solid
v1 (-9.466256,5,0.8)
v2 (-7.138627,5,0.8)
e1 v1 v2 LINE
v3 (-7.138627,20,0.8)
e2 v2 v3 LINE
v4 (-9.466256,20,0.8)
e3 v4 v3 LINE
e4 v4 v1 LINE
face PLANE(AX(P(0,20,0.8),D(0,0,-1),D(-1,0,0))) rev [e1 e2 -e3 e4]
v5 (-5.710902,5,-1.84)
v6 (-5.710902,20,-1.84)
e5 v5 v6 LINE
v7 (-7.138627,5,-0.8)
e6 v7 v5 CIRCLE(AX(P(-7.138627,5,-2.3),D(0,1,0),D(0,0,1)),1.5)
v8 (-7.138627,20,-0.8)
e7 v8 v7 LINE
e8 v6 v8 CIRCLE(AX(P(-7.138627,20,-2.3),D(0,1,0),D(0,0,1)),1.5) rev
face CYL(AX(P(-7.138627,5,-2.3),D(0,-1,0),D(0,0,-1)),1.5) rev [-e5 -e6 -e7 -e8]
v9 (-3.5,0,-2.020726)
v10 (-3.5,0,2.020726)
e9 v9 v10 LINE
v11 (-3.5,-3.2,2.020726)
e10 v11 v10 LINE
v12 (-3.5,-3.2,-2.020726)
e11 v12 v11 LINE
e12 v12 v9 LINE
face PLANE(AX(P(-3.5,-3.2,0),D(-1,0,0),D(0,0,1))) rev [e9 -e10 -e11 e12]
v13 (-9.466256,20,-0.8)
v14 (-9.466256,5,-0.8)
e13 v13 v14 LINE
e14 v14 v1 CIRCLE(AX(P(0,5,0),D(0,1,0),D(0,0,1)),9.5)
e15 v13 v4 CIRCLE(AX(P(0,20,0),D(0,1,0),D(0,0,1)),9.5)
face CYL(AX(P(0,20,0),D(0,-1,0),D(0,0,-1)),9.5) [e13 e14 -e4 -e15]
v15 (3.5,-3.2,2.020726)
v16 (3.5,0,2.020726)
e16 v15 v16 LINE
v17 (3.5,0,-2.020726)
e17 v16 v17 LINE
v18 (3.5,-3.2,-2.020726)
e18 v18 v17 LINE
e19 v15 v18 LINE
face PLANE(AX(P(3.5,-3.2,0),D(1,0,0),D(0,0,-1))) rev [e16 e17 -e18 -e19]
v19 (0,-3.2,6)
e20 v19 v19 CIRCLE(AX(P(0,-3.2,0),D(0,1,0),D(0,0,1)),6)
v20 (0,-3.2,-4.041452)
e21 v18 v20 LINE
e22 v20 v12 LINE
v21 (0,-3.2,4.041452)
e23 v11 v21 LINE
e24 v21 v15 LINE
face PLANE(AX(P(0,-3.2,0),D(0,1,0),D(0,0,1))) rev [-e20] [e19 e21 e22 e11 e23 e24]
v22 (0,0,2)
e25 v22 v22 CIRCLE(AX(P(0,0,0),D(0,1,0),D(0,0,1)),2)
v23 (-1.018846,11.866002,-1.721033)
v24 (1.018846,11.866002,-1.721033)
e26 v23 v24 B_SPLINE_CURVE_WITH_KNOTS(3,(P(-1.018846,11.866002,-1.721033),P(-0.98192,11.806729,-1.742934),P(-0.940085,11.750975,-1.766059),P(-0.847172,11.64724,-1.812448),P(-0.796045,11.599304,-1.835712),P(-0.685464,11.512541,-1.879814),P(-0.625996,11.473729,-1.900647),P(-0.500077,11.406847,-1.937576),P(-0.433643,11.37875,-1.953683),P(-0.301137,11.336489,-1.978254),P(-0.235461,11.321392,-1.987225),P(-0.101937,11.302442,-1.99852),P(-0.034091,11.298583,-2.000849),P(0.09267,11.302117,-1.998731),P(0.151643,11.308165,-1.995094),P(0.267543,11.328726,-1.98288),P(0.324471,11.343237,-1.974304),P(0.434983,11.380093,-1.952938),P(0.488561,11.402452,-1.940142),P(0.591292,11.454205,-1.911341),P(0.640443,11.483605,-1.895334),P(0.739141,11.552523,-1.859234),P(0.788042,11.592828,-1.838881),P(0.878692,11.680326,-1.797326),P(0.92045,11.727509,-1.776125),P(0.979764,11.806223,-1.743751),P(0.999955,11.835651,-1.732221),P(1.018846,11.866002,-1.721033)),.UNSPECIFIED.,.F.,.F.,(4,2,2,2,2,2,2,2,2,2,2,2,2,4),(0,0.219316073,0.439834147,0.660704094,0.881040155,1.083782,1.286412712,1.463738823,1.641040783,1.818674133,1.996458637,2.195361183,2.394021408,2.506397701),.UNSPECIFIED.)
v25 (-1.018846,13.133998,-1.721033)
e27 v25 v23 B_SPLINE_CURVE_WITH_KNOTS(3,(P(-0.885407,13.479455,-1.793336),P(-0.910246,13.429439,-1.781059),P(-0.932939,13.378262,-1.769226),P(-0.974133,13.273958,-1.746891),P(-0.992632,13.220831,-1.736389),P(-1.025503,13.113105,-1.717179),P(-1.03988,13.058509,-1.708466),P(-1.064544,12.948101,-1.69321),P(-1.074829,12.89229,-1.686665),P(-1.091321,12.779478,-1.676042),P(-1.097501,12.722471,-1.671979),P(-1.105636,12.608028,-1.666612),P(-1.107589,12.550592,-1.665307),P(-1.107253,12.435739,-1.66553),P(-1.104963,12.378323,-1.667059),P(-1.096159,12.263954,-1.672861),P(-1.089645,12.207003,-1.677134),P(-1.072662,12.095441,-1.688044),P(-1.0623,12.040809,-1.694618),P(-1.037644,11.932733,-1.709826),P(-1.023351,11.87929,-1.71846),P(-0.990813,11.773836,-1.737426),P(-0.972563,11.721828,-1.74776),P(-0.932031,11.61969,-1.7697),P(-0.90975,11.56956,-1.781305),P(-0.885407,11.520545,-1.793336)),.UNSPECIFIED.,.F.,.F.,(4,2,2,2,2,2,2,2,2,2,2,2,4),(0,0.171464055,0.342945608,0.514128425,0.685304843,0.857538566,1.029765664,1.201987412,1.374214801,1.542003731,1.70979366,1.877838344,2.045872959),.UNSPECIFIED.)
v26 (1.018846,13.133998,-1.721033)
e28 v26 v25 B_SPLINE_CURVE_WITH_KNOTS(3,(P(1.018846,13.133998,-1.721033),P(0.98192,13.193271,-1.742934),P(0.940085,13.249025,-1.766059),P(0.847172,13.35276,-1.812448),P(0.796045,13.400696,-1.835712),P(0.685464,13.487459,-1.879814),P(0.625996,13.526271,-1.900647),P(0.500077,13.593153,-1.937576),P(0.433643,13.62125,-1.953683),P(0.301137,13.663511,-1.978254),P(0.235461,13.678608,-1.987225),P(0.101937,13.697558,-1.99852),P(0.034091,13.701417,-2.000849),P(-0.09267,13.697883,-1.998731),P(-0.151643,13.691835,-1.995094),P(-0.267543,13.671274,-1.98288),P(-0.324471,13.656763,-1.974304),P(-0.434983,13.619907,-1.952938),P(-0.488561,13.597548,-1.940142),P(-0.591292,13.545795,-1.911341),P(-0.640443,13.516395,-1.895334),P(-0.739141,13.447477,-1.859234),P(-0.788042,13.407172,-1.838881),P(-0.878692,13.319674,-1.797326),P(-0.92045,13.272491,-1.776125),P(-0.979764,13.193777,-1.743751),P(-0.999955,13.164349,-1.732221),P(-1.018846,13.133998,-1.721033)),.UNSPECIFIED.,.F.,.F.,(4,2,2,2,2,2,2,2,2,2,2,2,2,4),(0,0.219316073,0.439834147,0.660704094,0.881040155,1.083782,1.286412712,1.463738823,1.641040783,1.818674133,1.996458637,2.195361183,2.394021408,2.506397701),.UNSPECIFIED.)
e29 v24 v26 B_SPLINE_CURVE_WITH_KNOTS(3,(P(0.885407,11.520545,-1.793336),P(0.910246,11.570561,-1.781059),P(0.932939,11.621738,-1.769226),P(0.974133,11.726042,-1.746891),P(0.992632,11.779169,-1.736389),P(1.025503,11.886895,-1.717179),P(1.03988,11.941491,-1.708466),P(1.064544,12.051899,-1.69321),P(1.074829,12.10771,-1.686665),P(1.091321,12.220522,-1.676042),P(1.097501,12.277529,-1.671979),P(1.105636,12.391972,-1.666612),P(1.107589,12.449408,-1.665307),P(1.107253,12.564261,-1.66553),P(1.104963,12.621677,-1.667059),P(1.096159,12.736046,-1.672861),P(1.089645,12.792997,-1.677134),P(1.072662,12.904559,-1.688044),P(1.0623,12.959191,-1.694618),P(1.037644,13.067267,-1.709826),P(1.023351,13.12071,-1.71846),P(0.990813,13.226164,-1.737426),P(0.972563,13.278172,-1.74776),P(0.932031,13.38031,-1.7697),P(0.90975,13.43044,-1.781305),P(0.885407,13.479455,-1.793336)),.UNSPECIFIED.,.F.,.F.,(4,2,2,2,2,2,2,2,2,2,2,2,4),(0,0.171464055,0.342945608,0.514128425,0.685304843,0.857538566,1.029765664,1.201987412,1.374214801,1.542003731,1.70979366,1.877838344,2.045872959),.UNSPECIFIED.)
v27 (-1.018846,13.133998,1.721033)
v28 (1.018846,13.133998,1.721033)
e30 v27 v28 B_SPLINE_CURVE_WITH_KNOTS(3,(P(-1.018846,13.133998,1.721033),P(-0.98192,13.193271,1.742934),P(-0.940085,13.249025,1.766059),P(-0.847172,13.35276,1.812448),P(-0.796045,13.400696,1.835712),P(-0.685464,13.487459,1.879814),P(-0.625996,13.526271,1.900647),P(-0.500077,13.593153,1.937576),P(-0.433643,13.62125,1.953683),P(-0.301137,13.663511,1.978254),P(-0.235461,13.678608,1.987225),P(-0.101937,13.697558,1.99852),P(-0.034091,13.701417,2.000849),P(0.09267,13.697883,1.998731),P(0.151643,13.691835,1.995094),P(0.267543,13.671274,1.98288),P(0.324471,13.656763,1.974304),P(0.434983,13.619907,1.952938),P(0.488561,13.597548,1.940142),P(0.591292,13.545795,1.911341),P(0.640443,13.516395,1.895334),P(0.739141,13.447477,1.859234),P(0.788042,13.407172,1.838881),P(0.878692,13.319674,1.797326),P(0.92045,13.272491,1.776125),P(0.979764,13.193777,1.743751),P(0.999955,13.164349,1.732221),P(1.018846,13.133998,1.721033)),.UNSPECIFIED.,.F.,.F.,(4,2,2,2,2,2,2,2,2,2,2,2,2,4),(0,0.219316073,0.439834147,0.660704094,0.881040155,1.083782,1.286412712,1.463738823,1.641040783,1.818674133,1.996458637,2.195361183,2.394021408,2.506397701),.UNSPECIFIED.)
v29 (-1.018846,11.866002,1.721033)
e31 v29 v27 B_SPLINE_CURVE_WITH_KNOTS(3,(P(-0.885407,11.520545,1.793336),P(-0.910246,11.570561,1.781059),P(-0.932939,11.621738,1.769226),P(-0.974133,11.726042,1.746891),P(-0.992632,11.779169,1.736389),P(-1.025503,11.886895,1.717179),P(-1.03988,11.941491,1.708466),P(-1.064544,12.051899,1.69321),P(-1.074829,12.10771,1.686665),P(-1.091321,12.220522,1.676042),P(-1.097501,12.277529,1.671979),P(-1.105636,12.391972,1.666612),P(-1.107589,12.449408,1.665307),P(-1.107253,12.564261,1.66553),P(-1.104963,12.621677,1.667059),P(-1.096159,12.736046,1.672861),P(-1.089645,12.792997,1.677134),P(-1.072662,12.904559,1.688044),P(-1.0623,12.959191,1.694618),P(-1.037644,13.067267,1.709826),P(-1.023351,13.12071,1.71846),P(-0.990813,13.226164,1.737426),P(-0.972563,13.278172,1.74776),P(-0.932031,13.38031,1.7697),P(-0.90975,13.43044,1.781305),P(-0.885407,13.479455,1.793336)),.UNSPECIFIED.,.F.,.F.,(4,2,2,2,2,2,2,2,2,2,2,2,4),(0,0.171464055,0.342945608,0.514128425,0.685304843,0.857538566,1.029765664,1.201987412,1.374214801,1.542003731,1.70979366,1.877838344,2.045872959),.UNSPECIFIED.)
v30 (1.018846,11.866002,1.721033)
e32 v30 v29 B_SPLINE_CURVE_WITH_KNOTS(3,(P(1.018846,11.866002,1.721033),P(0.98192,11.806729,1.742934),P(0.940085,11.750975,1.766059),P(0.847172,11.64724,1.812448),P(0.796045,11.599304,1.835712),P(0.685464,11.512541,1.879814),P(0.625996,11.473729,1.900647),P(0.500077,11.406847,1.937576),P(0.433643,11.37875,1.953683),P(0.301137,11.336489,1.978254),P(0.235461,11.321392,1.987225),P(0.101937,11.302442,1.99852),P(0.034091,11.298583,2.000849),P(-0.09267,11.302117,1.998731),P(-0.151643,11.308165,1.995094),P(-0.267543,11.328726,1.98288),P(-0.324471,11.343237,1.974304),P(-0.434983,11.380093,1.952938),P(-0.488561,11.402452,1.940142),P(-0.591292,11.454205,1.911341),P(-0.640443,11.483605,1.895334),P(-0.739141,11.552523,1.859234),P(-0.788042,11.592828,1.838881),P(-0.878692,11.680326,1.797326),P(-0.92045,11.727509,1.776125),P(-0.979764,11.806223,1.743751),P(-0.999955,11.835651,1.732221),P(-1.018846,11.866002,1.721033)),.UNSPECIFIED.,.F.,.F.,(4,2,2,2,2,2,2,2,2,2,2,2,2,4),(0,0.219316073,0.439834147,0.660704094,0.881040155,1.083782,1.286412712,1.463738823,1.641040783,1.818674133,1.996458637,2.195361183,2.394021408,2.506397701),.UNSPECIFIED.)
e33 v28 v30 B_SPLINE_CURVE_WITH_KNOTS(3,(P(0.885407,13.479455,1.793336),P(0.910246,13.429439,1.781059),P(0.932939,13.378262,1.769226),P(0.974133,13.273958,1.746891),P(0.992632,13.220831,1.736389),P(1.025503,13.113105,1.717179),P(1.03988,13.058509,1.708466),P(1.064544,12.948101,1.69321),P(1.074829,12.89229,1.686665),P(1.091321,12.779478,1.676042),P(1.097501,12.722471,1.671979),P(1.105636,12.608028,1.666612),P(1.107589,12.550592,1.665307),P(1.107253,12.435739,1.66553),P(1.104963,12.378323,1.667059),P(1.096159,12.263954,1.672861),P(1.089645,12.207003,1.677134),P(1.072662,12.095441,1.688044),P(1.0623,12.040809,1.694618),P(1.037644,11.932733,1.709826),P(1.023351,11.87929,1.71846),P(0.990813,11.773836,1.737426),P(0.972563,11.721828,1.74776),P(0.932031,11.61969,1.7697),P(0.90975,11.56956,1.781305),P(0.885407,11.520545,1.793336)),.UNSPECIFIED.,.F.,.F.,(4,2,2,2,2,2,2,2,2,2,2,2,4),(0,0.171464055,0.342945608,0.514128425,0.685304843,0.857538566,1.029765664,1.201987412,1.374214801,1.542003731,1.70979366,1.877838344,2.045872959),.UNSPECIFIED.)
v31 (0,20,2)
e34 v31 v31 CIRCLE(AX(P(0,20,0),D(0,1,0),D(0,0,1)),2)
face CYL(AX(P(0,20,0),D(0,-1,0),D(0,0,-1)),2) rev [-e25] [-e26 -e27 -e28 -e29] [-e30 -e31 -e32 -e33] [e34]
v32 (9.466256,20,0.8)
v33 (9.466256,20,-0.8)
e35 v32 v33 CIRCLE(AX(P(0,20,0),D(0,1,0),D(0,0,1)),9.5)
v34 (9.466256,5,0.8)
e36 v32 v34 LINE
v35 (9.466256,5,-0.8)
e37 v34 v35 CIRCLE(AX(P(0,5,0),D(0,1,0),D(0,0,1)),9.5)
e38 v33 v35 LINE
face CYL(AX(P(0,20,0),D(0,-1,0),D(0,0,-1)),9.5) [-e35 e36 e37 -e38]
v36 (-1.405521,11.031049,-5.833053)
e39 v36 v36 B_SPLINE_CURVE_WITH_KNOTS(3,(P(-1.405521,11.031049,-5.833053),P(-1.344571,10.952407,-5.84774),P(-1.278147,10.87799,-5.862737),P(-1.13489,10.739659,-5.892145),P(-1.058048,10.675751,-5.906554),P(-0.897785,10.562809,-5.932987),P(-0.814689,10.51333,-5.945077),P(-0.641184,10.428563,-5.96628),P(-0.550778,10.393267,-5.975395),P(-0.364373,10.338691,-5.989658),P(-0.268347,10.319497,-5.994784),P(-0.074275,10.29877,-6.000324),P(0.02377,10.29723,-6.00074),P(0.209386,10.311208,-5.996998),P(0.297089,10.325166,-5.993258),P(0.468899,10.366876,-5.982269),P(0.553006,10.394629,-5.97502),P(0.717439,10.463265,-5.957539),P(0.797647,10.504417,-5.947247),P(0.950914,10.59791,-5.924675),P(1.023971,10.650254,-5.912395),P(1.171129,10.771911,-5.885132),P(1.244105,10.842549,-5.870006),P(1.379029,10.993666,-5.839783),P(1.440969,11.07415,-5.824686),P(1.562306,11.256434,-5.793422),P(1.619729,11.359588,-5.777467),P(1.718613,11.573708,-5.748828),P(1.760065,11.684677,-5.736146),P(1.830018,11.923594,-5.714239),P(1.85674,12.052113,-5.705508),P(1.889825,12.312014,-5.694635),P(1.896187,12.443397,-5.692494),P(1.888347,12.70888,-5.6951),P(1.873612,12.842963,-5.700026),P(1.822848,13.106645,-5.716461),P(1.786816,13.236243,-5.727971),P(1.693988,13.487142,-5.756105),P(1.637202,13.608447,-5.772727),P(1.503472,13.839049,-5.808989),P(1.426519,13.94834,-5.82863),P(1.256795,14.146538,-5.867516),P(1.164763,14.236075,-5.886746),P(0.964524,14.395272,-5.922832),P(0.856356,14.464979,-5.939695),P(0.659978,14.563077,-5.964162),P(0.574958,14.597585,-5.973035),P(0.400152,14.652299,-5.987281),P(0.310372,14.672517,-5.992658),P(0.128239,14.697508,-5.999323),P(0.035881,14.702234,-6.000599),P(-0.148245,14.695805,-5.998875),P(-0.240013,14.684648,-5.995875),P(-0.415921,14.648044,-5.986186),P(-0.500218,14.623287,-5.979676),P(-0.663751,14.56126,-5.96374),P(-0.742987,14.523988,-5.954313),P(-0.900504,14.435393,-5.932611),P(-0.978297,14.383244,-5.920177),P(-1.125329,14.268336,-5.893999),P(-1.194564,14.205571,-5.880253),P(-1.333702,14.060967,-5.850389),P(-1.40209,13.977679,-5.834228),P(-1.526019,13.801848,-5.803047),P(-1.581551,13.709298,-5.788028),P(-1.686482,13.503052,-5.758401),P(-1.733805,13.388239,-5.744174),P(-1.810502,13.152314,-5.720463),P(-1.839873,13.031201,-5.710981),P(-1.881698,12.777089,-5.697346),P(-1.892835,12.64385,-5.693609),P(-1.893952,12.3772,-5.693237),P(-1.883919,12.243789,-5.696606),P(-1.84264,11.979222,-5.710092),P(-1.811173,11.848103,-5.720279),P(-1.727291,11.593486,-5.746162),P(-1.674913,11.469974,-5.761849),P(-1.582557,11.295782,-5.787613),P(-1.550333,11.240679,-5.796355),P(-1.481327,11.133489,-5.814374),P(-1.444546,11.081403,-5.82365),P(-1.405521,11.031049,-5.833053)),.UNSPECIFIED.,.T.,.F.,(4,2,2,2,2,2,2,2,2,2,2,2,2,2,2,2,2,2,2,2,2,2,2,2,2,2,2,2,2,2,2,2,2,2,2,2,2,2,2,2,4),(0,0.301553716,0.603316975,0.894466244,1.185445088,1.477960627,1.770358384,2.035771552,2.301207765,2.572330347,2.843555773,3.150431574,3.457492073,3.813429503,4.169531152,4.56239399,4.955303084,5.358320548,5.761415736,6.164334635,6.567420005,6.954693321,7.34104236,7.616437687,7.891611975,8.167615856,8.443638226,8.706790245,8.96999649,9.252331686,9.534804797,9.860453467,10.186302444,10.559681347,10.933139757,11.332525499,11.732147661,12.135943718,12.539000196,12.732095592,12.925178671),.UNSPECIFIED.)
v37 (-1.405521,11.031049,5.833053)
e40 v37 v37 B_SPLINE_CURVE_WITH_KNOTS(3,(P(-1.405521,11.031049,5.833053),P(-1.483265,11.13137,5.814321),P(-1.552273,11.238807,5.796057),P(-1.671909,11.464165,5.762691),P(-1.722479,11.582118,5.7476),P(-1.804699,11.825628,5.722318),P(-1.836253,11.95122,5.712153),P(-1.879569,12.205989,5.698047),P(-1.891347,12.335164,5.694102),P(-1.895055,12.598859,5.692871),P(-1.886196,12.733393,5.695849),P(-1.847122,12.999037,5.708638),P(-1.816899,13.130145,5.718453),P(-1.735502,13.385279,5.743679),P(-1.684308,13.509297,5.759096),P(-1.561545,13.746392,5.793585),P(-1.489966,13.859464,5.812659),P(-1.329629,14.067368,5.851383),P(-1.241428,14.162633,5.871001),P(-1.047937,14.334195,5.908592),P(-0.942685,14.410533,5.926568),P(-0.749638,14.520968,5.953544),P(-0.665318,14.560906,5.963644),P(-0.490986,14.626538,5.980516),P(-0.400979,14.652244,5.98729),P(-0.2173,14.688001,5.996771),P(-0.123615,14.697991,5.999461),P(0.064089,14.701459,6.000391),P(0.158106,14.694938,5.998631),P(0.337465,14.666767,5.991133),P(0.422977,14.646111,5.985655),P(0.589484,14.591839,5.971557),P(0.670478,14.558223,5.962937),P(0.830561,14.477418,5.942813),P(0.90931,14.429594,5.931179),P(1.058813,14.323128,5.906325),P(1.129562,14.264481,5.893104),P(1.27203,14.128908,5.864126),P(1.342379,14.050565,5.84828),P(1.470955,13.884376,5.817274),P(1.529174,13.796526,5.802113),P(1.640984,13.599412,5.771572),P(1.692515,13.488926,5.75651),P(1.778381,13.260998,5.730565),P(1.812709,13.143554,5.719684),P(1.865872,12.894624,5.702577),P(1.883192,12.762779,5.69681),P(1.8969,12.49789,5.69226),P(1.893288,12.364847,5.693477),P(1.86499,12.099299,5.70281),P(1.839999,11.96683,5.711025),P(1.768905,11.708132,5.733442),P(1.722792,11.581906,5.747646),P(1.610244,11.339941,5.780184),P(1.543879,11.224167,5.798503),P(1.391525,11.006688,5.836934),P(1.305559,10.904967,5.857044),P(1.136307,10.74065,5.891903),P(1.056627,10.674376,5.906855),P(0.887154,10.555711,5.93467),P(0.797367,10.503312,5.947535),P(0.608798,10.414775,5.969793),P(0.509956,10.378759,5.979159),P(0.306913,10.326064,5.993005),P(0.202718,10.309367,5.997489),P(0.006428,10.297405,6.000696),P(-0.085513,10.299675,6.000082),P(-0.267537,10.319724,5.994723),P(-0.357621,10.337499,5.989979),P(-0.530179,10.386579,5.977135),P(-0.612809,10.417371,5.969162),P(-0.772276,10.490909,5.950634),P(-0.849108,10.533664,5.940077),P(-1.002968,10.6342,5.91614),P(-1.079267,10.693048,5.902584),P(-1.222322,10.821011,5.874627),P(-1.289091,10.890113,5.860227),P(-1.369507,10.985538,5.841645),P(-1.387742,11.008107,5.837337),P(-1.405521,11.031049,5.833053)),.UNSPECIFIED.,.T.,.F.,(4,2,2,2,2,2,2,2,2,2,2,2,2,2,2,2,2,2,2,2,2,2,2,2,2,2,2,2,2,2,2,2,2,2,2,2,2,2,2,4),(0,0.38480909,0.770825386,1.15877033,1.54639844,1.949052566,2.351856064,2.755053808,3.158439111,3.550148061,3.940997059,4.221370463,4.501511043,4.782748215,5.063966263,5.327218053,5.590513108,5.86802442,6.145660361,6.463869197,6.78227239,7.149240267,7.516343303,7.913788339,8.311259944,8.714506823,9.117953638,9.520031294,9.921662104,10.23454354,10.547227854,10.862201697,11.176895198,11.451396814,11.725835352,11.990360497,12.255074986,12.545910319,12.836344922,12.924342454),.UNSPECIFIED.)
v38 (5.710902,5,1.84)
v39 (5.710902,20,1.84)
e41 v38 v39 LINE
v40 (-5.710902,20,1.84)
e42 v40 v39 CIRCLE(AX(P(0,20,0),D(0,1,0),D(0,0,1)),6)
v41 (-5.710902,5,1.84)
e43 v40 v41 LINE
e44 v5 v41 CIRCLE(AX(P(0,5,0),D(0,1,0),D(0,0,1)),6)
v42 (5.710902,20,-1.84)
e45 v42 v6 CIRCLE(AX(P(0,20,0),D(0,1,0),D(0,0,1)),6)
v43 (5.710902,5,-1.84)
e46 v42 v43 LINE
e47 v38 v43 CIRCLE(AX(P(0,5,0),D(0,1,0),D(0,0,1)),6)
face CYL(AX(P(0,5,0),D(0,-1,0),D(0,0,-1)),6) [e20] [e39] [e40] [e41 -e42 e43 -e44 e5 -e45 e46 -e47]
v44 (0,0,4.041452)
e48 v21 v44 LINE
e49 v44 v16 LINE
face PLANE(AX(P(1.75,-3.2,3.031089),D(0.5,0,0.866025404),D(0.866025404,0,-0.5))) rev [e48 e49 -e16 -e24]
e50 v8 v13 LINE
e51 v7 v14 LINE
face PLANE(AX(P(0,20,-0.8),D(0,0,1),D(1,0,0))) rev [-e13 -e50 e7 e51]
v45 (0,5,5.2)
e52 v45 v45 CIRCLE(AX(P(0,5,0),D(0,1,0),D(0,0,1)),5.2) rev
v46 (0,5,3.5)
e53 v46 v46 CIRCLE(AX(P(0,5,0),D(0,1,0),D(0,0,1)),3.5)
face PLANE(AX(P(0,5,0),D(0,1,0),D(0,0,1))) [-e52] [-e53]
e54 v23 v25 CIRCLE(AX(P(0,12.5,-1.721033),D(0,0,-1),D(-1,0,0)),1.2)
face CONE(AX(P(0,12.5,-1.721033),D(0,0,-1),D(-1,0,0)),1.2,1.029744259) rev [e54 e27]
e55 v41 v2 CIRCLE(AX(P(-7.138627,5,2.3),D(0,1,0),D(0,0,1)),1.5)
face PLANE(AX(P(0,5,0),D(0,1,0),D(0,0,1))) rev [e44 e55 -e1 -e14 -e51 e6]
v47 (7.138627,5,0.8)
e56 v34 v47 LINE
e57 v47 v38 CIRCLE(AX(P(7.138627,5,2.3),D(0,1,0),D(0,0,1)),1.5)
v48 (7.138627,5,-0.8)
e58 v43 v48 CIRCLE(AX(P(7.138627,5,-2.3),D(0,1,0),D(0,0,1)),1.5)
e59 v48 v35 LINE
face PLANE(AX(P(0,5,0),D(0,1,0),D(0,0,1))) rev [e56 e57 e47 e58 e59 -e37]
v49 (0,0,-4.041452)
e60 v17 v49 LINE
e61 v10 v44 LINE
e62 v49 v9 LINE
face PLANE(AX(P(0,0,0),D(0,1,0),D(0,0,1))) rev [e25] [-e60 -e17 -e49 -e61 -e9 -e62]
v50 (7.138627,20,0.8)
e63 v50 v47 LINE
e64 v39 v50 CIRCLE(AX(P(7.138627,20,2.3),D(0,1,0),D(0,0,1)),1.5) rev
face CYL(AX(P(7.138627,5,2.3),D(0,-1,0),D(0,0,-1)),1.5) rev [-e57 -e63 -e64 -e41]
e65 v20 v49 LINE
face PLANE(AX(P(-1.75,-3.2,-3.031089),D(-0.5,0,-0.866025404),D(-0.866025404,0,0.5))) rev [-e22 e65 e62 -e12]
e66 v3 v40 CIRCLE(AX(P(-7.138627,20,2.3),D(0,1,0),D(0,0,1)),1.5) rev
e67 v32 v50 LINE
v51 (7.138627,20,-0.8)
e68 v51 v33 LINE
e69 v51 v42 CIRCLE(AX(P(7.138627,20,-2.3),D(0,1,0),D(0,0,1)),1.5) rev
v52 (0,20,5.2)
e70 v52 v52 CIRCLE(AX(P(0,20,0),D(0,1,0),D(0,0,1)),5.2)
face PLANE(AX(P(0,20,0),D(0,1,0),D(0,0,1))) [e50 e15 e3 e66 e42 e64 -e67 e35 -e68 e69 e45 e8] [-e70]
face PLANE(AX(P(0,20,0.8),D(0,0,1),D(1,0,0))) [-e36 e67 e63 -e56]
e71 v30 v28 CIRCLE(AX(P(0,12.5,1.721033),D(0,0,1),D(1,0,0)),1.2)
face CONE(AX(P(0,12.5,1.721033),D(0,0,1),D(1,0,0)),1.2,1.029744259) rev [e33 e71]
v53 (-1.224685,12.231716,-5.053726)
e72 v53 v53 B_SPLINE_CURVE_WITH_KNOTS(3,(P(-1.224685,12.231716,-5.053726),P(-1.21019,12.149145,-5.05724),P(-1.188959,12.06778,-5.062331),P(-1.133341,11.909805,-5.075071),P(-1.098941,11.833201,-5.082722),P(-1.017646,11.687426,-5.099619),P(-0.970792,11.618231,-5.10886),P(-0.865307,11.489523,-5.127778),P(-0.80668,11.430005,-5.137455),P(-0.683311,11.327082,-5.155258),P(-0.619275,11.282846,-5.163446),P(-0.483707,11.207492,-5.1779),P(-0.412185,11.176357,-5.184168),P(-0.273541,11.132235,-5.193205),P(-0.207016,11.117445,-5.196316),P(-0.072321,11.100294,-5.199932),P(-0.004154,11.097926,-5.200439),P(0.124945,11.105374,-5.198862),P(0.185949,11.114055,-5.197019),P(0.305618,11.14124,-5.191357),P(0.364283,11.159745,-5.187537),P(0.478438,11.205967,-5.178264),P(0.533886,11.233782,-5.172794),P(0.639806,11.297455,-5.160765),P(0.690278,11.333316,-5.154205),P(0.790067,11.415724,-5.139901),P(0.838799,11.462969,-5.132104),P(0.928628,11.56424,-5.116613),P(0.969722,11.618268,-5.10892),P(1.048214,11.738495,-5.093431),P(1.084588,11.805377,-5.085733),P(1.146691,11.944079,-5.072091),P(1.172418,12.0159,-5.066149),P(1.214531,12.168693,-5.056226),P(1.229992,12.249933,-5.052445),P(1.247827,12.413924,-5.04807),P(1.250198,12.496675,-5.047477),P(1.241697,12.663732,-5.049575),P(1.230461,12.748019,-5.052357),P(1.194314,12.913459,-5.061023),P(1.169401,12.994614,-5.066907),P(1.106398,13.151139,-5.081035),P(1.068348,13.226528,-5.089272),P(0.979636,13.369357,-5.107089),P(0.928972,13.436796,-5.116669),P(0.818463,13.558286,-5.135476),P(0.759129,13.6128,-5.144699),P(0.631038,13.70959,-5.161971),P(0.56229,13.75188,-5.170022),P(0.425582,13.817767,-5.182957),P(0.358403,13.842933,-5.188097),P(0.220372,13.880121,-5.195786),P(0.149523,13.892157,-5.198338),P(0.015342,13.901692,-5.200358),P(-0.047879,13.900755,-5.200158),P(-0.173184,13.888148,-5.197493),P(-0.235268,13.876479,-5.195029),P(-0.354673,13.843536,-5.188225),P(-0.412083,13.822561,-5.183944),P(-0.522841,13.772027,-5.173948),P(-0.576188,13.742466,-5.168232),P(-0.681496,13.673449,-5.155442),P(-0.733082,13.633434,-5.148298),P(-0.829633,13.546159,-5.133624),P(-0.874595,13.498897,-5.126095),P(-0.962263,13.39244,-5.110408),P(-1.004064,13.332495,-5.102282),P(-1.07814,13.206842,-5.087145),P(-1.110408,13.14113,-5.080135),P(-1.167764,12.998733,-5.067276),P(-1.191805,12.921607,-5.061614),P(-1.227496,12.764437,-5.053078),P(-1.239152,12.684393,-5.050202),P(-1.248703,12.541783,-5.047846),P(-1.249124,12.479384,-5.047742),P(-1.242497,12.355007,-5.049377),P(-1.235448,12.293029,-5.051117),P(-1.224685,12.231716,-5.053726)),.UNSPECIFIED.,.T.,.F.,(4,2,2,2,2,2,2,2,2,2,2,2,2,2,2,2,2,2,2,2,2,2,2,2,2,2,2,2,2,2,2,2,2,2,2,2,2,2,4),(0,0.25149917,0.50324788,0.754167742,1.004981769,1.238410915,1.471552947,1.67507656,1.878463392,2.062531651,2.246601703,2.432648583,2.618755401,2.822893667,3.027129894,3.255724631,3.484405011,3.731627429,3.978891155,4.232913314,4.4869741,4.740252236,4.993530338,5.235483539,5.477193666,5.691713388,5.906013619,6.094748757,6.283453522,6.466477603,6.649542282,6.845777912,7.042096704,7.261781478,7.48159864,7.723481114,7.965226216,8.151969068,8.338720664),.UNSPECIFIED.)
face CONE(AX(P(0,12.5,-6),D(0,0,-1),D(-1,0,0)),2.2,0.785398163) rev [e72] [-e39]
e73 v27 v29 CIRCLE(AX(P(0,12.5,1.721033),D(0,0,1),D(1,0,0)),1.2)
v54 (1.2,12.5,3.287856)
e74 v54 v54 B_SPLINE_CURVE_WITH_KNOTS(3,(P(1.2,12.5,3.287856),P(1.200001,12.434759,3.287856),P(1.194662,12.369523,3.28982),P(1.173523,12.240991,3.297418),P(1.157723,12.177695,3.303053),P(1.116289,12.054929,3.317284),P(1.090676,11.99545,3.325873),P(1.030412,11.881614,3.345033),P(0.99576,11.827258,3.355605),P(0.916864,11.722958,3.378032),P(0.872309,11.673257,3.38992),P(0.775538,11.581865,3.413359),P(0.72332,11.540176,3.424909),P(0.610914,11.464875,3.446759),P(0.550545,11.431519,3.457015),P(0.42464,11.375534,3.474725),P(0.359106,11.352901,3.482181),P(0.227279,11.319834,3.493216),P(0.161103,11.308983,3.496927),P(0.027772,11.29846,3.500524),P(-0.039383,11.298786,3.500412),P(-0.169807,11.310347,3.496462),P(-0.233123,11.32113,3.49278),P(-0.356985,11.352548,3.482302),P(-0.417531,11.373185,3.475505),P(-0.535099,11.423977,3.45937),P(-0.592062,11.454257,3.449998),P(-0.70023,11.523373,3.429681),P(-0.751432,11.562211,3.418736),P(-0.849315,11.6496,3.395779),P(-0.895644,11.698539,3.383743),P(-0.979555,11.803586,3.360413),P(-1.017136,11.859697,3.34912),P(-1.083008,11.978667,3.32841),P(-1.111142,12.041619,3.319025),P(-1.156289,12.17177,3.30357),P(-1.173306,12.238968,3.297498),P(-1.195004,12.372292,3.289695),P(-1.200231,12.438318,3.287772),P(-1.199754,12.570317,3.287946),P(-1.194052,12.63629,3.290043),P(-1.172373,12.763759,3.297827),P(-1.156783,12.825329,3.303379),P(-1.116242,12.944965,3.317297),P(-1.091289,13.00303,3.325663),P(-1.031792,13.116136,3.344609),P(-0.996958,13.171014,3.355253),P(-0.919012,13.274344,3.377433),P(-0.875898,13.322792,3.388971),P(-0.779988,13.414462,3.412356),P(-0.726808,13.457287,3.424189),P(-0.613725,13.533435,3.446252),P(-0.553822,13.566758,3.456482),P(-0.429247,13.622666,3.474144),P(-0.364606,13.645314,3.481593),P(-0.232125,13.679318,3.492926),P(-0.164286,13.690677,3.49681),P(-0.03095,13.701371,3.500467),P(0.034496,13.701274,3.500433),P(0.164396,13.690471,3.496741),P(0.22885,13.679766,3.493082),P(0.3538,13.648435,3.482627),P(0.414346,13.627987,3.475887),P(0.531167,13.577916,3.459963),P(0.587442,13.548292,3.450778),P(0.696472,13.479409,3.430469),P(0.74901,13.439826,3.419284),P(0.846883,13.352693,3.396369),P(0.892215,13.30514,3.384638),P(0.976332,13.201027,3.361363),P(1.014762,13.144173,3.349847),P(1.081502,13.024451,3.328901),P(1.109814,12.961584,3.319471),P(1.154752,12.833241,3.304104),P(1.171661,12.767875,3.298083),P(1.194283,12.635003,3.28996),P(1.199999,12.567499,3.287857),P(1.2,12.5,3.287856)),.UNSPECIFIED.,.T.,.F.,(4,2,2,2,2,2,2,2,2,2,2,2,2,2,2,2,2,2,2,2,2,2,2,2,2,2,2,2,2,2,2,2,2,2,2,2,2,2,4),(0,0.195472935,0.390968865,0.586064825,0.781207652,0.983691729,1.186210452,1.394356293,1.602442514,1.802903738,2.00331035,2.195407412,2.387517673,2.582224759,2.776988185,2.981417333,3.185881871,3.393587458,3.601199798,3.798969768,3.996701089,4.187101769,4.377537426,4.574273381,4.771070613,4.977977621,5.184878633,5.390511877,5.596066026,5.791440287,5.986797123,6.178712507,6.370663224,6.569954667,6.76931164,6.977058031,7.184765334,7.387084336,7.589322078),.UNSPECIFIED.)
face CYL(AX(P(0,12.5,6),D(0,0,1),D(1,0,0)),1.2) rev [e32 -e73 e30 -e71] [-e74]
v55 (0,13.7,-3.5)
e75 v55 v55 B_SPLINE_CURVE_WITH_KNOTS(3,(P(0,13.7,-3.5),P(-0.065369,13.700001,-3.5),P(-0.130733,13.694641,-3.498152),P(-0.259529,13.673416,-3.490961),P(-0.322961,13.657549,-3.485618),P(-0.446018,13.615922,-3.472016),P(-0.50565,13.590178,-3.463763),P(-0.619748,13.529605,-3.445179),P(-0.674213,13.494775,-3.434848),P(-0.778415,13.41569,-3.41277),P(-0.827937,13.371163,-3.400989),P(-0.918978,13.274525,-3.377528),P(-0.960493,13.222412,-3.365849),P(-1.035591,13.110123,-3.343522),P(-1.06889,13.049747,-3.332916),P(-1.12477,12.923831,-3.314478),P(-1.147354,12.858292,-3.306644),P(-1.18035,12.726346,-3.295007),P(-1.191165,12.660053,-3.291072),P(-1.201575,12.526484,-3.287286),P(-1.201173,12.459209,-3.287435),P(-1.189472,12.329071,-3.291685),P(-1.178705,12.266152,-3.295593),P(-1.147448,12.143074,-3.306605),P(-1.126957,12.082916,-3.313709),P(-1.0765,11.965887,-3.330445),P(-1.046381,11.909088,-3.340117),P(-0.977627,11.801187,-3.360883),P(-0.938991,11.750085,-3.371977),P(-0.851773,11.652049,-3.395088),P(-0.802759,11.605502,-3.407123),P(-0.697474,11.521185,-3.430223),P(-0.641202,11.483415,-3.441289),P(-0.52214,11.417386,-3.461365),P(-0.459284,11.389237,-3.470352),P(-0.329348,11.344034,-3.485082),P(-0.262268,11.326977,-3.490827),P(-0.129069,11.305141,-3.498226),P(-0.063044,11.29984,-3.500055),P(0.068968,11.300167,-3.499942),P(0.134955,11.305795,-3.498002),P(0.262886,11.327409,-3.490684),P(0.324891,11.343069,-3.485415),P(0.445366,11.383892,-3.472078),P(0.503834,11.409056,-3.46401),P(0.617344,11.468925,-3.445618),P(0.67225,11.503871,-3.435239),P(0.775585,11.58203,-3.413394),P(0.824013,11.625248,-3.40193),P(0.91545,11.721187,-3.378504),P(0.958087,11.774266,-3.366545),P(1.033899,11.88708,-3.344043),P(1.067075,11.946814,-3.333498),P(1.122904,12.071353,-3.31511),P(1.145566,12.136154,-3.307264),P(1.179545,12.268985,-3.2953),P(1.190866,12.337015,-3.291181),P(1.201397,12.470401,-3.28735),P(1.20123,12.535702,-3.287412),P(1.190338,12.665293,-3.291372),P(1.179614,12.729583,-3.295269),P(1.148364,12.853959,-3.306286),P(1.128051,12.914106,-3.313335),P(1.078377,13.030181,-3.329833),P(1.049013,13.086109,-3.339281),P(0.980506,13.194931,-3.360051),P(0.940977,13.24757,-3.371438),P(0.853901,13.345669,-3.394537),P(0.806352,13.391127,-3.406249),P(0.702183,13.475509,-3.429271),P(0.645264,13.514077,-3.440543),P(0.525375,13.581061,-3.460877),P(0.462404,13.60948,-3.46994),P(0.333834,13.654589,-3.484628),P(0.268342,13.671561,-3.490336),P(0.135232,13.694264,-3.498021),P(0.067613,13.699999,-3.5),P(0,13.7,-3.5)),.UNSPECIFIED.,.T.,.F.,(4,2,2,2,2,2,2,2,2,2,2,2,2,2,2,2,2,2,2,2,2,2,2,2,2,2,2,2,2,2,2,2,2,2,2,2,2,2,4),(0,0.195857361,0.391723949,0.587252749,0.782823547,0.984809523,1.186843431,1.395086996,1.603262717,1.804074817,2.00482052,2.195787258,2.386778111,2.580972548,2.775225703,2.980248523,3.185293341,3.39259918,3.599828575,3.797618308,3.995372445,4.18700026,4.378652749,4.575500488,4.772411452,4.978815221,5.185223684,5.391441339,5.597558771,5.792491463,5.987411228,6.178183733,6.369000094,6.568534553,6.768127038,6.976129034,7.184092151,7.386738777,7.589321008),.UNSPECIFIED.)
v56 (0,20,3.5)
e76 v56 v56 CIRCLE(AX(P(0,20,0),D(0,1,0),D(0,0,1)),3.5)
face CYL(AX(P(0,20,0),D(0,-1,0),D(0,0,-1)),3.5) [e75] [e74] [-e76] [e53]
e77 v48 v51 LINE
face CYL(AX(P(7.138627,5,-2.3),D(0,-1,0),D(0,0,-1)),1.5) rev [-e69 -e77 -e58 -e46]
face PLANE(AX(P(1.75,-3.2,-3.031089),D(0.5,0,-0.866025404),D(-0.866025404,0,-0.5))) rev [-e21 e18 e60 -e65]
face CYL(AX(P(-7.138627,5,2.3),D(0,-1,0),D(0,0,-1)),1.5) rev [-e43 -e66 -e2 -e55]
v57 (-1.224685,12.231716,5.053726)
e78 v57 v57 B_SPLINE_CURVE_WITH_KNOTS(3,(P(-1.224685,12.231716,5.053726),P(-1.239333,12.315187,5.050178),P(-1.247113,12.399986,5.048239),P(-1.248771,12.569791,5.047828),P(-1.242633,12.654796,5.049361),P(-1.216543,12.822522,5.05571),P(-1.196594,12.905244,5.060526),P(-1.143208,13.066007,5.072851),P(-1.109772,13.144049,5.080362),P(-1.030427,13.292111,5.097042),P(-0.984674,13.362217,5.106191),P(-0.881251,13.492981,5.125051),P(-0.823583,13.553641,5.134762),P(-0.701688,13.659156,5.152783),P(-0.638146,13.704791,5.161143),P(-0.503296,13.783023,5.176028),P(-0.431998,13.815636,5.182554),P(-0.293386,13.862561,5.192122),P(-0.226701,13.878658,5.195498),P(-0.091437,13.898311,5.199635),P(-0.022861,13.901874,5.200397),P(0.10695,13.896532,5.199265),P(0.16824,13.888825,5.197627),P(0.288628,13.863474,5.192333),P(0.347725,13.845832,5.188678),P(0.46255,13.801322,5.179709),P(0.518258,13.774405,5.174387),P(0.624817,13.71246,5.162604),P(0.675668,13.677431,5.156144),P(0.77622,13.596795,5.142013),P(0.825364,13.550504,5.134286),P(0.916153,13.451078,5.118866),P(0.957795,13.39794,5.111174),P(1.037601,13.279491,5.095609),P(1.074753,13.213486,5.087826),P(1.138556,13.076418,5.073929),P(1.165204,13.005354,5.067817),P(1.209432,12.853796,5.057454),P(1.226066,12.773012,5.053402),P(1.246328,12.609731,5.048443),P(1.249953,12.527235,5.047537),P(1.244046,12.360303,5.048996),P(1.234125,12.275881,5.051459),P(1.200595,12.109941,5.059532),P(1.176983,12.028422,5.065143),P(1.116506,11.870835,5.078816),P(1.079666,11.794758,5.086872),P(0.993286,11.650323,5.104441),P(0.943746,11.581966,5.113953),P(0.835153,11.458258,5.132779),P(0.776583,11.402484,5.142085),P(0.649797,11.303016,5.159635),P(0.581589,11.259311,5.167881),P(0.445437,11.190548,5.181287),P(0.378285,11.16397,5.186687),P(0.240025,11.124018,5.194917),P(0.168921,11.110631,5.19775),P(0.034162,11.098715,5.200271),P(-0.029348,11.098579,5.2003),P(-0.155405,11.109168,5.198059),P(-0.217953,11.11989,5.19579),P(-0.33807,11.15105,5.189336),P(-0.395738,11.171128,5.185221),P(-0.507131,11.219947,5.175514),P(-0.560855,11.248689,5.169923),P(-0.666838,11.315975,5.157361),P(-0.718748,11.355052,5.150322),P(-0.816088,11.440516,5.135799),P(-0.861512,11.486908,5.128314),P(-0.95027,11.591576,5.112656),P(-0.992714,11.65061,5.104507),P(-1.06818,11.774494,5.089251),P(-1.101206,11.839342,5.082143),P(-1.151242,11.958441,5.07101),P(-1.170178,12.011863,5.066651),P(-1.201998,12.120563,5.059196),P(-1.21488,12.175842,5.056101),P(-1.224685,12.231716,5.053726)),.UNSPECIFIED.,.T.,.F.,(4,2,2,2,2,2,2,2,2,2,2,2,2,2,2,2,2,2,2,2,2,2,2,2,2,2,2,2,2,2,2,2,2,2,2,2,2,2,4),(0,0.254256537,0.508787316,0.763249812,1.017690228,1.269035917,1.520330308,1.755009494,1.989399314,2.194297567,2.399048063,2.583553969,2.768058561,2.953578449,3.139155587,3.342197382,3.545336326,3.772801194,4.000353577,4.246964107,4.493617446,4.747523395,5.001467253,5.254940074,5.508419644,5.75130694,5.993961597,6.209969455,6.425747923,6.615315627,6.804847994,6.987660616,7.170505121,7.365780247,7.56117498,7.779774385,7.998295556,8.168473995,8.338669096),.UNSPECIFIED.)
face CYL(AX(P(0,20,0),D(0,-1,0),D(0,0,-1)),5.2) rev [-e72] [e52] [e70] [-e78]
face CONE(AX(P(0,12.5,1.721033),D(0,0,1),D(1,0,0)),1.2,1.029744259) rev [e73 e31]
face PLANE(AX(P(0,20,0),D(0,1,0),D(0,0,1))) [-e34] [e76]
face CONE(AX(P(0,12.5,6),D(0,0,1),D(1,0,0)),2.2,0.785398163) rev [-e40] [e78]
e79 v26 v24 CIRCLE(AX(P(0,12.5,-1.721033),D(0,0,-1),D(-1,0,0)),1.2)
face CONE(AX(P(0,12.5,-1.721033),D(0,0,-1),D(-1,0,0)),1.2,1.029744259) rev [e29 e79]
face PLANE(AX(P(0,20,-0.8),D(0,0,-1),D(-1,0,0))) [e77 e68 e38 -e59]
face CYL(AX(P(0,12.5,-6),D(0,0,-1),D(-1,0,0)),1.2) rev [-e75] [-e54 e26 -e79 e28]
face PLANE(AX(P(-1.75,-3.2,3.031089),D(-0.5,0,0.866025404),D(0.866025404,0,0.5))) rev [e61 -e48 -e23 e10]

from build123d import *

# Parameters (mm, degrees)
SKETCH1_R           = 3.5
SKETCH1_R_2         = 2
BOSS_EXTRUDE1_DEPTH = 20
SKETCH1_3_R         = 6
BOSS_EXTRUDE2_DEPTH = 3.2
SKETCH1_4_R         = 6
BOSS_EXTRUDE3_DEPTH = 5
SKETCH2_R           = 5.2
BOSS_EXTRUDE4_DEPTH = 15
CIRPATTERN1_COUNT   = 2
FILLET1_R           = 1.5


with BuildPart() as part:
    # Sketch1 → Boss-Extrude1 (new body)
    with BuildSketch(Plane(origin=(0, 0, 0), x_dir=(1, 0, 0), z_dir=(0, 1, 0))):
        with Locations(Location((0, 0, 0), (0, 0, 270))):
            Circle(SKETCH1_R)
        with Locations(Location((0, 0, 0), (0, 0, 270))):
            Circle(SKETCH1_R_2, mode=Mode.SUBTRACT)
    extrude(amount=BOSS_EXTRUDE1_DEPTH)



with BuildPart() as body_2:
    # Sketch1<3> → Boss-Extrude2 (new body)
    with BuildSketch(Plane(origin=(0, 0, 0), x_dir=(1, 0, 0), z_dir=(0, 1, 0))):
        with Locations(Location((0, 0, 0), (0, 0, 270))):
            Circle(SKETCH1_3_R)
        Polygon((0, -4.041451884), (3.5, -2.020725942), (3.5, 2.020725942), (0, 4.041451884), (-3.5, 2.020725942), (-3.5, -2.020725942), align=None, mode=Mode.SUBTRACT)
    extrude(amount=-BOSS_EXTRUDE2_DEPTH)


with BuildPart() as part_1:
    add(part.part)

    add(body_2.part)  # Boss-Extrude3 merges body 2
    # Sketch1<4> → Boss-Extrude3 (add)
    # profile 1 of 7: a face of its own
    with BuildSketch(Plane(origin=(0, 0, 0), x_dir=(1, 0, 0), z_dir=(0, 1, 0))):
        with Locations(Location((0, 0, 0), (0, 0, 270))):
            Circle(SKETCH1_4_R)
        Polygon((0, -4.041451884), (3.5, -2.020725942), (3.5, 2.020725942), (0, 4.041451884), (-3.5, 2.020725942), (-3.5, -2.020725942), align=None, mode=Mode.SUBTRACT)
    # profile 2 of 7: a face of its own
    with BuildSketch(Plane(origin=(0, 0, 0), x_dir=(1, 0, 0), z_dir=(0, 1, 0))):
        with BuildLine():
            ThreePointArc((-1.749999906, 3.031088968), (8.8e-08, 3.5), (1.750000057, 3.03108888))
            Line((1.750000057, 3.03108888), (0, 4.041451884))
            Line((0, 4.041451884), (-1.749999906, 3.031088968))
        make_face()
    # profile 3 of 7: a face of its own
    with BuildSketch(Plane(origin=(0, 0, 0), x_dir=(1, 0, 0), z_dir=(0, 1, 0))):
        with BuildLine():
            ThreePointArc((1.750000057, 3.03108888), (3.03108893, 1.749999971), (3.5, 0))
            Line((3.5, 0), (3.5, 2.020725942))
            Line((3.5, 2.020725942), (1.750000057, 3.03108888))
        make_face()
    # profile 4 of 7: a face of its own
    with BuildSketch(Plane(origin=(0, 0, 0), x_dir=(1, 0, 0), z_dir=(0, 1, 0))):
        with BuildLine():
            Line((1.750000074, -3.03108887), (3.5, -2.020725942))
            Line((3.5, -2.020725942), (3.5, 0))
            ThreePointArc((3.5, 0), (3.031088935, -1.749999963), (1.750000074, -3.03108887))
        make_face()
    # profile 5 of 7: a face of its own
    with BuildSketch(Plane(origin=(0, 0, 0), x_dir=(1, 0, 0), z_dir=(0, 1, 0))):
        with BuildLine():
            Line((0, -4.041451884), (1.750000074, -3.03108887))
            ThreePointArc((1.750000074, -3.03108887), (5.1e-08, -3.5), (-1.749999986, -3.031088921))
            Line((-1.749999986, -3.031088921), (0, -4.041451884))
        make_face()
    # profile 6 of 7: a face of its own
    with BuildSketch(Plane(origin=(0, 0, 0), x_dir=(1, 0, 0), z_dir=(0, 1, 0))):
        with BuildLine():
            Line((-3.5, -2.020725942), (-1.749999986, -3.031088921))
            ThreePointArc((-1.749999986, -3.031088921), (-3.031088909, -1.750000007), (-3.5, 0))
            Line((-3.5, 0), (-3.5, -2.020725942))
        make_face()
    # profile 7 of 7: a face of its own
    with BuildSketch(Plane(origin=(0, 0, 0), x_dir=(1, 0, 0), z_dir=(0, 1, 0))):
        with BuildLine():
            ThreePointArc((-3.5, 0), (-3.031088886, 1.750000047), (-1.749999906, 3.031088968))
            Line((-1.749999906, 3.031088968), (-3.5, 2.020725942))
            Line((-3.5, 2.020725942), (-3.5, 0))
        make_face()
    extrude(amount=BOSS_EXTRUDE3_DEPTH)

    # Sketch2 → Boss-Extrude4 (add)
    with BuildSketch(Plane(origin=(0, 5, 0), x_dir=(1, 0, 0), z_dir=(0, 1, 0))):
        with BuildLine():
            Line((-9.46625586, -0.8), (-5.946427499, -0.8))
            ThreePointArc((-5.946427499, -0.8), (0, -6), (5.946427499, -0.8))
            Line((5.946427499, -0.8), (9.46625586, -0.8))
            ThreePointArc((9.46625586, -0.8), (9.5, 0), (9.46625586, 0.8))
            Line((9.46625586, 0.8), (5.946427499, 0.8))
            ThreePointArc((5.946427499, 0.8), (0, 6), (-5.946427499, 0.8))
            Line((-5.946427499, 0.8), (-9.46625586, 0.8))
            ThreePointArc((-9.46625586, 0.8), (-9.5, 0), (-9.46625586, -0.8))
        make_face()
        with Locations(Location((0, 0, 0), (0, 0, 270))):
            Circle(SKETCH2_R, mode=Mode.SUBTRACT)
    extrude(amount=BOSS_EXTRUDE4_DEPTH)

    # Sketch5 → CSK for M2 Flat Head Machine Screw1 (revolve, cut)
    with BuildSketch(Plane(origin=(0, 12.5, -6), x_dir=(0, 1, 0), z_dir=(1, 0, 0))):
        Polygon((0, 0), (0, 5), (1.2, 4.278967257), (1.2, 1), (2.2, 0), align=None)
    csk_for_m2_flat_head_machine_screw1 = revolve(axis=Axis((0, 12.5, -12.35), (0, 0, 1)), mode=Mode.SUBTRACT)

    # CirPattern1: CSK for M2 Flat Head Machine Screw1 ×2 about axis
    cirpattern1_axis = Axis((0, 5, 0), (0, -1, 0))
    for i in range(1, CIRPATTERN1_COUNT):
        add(csk_for_m2_flat_head_machine_screw1.rotate(cirpattern1_axis, i * 360 / CIRPATTERN1_COUNT), mode=Mode.SUBTRACT)

    # Fillet1
    # the kernel refuses this fillet: 1.5 mm, written as the material it adds along each edge
    with BuildSketch(Plane(origin=(-5.946427499, 5, 0.8), x_dir=(-1, 0, 0), z_dir=(0, 1, 0)), Plane(origin=(5.946427499, 5, -0.8), x_dir=(1, 0, 0), z_dir=(0, 1, 0))) as fillet1_piece_1:
        with BuildLine():
            CenterArc((1.19219982, 1.5), FILLET1_R, 197.858462698, 72.141537302)
            ThreePointArc((-0.235525644, 1.04), (-0.094613086, 0.52524265), (0, 0))
            Line((0, 0), (1.19219982, 0))
        make_face()
    extrude(amount=15)
    with BuildSketch(Plane(origin=(5.946427499, 5, 0.8), x_dir=(1, 0, 0), z_dir=(0, 1, 0)), Plane(origin=(-5.946427499, 5, -0.8), x_dir=(-1, 0, 0), z_dir=(0, 1, 0))) as fillet1_piece_2:
        with BuildLine():
            CenterArc((1.19219982, -1.5), FILLET1_R, 90, 72.141537302)
            ThreePointArc((-0.235525644, -1.04), (-0.094613086, -0.52524265), (0, 0))
            Line((0, 0), (1.19219982, 0))
        make_face()
    extrude(amount=15)


solid = part_1.part
